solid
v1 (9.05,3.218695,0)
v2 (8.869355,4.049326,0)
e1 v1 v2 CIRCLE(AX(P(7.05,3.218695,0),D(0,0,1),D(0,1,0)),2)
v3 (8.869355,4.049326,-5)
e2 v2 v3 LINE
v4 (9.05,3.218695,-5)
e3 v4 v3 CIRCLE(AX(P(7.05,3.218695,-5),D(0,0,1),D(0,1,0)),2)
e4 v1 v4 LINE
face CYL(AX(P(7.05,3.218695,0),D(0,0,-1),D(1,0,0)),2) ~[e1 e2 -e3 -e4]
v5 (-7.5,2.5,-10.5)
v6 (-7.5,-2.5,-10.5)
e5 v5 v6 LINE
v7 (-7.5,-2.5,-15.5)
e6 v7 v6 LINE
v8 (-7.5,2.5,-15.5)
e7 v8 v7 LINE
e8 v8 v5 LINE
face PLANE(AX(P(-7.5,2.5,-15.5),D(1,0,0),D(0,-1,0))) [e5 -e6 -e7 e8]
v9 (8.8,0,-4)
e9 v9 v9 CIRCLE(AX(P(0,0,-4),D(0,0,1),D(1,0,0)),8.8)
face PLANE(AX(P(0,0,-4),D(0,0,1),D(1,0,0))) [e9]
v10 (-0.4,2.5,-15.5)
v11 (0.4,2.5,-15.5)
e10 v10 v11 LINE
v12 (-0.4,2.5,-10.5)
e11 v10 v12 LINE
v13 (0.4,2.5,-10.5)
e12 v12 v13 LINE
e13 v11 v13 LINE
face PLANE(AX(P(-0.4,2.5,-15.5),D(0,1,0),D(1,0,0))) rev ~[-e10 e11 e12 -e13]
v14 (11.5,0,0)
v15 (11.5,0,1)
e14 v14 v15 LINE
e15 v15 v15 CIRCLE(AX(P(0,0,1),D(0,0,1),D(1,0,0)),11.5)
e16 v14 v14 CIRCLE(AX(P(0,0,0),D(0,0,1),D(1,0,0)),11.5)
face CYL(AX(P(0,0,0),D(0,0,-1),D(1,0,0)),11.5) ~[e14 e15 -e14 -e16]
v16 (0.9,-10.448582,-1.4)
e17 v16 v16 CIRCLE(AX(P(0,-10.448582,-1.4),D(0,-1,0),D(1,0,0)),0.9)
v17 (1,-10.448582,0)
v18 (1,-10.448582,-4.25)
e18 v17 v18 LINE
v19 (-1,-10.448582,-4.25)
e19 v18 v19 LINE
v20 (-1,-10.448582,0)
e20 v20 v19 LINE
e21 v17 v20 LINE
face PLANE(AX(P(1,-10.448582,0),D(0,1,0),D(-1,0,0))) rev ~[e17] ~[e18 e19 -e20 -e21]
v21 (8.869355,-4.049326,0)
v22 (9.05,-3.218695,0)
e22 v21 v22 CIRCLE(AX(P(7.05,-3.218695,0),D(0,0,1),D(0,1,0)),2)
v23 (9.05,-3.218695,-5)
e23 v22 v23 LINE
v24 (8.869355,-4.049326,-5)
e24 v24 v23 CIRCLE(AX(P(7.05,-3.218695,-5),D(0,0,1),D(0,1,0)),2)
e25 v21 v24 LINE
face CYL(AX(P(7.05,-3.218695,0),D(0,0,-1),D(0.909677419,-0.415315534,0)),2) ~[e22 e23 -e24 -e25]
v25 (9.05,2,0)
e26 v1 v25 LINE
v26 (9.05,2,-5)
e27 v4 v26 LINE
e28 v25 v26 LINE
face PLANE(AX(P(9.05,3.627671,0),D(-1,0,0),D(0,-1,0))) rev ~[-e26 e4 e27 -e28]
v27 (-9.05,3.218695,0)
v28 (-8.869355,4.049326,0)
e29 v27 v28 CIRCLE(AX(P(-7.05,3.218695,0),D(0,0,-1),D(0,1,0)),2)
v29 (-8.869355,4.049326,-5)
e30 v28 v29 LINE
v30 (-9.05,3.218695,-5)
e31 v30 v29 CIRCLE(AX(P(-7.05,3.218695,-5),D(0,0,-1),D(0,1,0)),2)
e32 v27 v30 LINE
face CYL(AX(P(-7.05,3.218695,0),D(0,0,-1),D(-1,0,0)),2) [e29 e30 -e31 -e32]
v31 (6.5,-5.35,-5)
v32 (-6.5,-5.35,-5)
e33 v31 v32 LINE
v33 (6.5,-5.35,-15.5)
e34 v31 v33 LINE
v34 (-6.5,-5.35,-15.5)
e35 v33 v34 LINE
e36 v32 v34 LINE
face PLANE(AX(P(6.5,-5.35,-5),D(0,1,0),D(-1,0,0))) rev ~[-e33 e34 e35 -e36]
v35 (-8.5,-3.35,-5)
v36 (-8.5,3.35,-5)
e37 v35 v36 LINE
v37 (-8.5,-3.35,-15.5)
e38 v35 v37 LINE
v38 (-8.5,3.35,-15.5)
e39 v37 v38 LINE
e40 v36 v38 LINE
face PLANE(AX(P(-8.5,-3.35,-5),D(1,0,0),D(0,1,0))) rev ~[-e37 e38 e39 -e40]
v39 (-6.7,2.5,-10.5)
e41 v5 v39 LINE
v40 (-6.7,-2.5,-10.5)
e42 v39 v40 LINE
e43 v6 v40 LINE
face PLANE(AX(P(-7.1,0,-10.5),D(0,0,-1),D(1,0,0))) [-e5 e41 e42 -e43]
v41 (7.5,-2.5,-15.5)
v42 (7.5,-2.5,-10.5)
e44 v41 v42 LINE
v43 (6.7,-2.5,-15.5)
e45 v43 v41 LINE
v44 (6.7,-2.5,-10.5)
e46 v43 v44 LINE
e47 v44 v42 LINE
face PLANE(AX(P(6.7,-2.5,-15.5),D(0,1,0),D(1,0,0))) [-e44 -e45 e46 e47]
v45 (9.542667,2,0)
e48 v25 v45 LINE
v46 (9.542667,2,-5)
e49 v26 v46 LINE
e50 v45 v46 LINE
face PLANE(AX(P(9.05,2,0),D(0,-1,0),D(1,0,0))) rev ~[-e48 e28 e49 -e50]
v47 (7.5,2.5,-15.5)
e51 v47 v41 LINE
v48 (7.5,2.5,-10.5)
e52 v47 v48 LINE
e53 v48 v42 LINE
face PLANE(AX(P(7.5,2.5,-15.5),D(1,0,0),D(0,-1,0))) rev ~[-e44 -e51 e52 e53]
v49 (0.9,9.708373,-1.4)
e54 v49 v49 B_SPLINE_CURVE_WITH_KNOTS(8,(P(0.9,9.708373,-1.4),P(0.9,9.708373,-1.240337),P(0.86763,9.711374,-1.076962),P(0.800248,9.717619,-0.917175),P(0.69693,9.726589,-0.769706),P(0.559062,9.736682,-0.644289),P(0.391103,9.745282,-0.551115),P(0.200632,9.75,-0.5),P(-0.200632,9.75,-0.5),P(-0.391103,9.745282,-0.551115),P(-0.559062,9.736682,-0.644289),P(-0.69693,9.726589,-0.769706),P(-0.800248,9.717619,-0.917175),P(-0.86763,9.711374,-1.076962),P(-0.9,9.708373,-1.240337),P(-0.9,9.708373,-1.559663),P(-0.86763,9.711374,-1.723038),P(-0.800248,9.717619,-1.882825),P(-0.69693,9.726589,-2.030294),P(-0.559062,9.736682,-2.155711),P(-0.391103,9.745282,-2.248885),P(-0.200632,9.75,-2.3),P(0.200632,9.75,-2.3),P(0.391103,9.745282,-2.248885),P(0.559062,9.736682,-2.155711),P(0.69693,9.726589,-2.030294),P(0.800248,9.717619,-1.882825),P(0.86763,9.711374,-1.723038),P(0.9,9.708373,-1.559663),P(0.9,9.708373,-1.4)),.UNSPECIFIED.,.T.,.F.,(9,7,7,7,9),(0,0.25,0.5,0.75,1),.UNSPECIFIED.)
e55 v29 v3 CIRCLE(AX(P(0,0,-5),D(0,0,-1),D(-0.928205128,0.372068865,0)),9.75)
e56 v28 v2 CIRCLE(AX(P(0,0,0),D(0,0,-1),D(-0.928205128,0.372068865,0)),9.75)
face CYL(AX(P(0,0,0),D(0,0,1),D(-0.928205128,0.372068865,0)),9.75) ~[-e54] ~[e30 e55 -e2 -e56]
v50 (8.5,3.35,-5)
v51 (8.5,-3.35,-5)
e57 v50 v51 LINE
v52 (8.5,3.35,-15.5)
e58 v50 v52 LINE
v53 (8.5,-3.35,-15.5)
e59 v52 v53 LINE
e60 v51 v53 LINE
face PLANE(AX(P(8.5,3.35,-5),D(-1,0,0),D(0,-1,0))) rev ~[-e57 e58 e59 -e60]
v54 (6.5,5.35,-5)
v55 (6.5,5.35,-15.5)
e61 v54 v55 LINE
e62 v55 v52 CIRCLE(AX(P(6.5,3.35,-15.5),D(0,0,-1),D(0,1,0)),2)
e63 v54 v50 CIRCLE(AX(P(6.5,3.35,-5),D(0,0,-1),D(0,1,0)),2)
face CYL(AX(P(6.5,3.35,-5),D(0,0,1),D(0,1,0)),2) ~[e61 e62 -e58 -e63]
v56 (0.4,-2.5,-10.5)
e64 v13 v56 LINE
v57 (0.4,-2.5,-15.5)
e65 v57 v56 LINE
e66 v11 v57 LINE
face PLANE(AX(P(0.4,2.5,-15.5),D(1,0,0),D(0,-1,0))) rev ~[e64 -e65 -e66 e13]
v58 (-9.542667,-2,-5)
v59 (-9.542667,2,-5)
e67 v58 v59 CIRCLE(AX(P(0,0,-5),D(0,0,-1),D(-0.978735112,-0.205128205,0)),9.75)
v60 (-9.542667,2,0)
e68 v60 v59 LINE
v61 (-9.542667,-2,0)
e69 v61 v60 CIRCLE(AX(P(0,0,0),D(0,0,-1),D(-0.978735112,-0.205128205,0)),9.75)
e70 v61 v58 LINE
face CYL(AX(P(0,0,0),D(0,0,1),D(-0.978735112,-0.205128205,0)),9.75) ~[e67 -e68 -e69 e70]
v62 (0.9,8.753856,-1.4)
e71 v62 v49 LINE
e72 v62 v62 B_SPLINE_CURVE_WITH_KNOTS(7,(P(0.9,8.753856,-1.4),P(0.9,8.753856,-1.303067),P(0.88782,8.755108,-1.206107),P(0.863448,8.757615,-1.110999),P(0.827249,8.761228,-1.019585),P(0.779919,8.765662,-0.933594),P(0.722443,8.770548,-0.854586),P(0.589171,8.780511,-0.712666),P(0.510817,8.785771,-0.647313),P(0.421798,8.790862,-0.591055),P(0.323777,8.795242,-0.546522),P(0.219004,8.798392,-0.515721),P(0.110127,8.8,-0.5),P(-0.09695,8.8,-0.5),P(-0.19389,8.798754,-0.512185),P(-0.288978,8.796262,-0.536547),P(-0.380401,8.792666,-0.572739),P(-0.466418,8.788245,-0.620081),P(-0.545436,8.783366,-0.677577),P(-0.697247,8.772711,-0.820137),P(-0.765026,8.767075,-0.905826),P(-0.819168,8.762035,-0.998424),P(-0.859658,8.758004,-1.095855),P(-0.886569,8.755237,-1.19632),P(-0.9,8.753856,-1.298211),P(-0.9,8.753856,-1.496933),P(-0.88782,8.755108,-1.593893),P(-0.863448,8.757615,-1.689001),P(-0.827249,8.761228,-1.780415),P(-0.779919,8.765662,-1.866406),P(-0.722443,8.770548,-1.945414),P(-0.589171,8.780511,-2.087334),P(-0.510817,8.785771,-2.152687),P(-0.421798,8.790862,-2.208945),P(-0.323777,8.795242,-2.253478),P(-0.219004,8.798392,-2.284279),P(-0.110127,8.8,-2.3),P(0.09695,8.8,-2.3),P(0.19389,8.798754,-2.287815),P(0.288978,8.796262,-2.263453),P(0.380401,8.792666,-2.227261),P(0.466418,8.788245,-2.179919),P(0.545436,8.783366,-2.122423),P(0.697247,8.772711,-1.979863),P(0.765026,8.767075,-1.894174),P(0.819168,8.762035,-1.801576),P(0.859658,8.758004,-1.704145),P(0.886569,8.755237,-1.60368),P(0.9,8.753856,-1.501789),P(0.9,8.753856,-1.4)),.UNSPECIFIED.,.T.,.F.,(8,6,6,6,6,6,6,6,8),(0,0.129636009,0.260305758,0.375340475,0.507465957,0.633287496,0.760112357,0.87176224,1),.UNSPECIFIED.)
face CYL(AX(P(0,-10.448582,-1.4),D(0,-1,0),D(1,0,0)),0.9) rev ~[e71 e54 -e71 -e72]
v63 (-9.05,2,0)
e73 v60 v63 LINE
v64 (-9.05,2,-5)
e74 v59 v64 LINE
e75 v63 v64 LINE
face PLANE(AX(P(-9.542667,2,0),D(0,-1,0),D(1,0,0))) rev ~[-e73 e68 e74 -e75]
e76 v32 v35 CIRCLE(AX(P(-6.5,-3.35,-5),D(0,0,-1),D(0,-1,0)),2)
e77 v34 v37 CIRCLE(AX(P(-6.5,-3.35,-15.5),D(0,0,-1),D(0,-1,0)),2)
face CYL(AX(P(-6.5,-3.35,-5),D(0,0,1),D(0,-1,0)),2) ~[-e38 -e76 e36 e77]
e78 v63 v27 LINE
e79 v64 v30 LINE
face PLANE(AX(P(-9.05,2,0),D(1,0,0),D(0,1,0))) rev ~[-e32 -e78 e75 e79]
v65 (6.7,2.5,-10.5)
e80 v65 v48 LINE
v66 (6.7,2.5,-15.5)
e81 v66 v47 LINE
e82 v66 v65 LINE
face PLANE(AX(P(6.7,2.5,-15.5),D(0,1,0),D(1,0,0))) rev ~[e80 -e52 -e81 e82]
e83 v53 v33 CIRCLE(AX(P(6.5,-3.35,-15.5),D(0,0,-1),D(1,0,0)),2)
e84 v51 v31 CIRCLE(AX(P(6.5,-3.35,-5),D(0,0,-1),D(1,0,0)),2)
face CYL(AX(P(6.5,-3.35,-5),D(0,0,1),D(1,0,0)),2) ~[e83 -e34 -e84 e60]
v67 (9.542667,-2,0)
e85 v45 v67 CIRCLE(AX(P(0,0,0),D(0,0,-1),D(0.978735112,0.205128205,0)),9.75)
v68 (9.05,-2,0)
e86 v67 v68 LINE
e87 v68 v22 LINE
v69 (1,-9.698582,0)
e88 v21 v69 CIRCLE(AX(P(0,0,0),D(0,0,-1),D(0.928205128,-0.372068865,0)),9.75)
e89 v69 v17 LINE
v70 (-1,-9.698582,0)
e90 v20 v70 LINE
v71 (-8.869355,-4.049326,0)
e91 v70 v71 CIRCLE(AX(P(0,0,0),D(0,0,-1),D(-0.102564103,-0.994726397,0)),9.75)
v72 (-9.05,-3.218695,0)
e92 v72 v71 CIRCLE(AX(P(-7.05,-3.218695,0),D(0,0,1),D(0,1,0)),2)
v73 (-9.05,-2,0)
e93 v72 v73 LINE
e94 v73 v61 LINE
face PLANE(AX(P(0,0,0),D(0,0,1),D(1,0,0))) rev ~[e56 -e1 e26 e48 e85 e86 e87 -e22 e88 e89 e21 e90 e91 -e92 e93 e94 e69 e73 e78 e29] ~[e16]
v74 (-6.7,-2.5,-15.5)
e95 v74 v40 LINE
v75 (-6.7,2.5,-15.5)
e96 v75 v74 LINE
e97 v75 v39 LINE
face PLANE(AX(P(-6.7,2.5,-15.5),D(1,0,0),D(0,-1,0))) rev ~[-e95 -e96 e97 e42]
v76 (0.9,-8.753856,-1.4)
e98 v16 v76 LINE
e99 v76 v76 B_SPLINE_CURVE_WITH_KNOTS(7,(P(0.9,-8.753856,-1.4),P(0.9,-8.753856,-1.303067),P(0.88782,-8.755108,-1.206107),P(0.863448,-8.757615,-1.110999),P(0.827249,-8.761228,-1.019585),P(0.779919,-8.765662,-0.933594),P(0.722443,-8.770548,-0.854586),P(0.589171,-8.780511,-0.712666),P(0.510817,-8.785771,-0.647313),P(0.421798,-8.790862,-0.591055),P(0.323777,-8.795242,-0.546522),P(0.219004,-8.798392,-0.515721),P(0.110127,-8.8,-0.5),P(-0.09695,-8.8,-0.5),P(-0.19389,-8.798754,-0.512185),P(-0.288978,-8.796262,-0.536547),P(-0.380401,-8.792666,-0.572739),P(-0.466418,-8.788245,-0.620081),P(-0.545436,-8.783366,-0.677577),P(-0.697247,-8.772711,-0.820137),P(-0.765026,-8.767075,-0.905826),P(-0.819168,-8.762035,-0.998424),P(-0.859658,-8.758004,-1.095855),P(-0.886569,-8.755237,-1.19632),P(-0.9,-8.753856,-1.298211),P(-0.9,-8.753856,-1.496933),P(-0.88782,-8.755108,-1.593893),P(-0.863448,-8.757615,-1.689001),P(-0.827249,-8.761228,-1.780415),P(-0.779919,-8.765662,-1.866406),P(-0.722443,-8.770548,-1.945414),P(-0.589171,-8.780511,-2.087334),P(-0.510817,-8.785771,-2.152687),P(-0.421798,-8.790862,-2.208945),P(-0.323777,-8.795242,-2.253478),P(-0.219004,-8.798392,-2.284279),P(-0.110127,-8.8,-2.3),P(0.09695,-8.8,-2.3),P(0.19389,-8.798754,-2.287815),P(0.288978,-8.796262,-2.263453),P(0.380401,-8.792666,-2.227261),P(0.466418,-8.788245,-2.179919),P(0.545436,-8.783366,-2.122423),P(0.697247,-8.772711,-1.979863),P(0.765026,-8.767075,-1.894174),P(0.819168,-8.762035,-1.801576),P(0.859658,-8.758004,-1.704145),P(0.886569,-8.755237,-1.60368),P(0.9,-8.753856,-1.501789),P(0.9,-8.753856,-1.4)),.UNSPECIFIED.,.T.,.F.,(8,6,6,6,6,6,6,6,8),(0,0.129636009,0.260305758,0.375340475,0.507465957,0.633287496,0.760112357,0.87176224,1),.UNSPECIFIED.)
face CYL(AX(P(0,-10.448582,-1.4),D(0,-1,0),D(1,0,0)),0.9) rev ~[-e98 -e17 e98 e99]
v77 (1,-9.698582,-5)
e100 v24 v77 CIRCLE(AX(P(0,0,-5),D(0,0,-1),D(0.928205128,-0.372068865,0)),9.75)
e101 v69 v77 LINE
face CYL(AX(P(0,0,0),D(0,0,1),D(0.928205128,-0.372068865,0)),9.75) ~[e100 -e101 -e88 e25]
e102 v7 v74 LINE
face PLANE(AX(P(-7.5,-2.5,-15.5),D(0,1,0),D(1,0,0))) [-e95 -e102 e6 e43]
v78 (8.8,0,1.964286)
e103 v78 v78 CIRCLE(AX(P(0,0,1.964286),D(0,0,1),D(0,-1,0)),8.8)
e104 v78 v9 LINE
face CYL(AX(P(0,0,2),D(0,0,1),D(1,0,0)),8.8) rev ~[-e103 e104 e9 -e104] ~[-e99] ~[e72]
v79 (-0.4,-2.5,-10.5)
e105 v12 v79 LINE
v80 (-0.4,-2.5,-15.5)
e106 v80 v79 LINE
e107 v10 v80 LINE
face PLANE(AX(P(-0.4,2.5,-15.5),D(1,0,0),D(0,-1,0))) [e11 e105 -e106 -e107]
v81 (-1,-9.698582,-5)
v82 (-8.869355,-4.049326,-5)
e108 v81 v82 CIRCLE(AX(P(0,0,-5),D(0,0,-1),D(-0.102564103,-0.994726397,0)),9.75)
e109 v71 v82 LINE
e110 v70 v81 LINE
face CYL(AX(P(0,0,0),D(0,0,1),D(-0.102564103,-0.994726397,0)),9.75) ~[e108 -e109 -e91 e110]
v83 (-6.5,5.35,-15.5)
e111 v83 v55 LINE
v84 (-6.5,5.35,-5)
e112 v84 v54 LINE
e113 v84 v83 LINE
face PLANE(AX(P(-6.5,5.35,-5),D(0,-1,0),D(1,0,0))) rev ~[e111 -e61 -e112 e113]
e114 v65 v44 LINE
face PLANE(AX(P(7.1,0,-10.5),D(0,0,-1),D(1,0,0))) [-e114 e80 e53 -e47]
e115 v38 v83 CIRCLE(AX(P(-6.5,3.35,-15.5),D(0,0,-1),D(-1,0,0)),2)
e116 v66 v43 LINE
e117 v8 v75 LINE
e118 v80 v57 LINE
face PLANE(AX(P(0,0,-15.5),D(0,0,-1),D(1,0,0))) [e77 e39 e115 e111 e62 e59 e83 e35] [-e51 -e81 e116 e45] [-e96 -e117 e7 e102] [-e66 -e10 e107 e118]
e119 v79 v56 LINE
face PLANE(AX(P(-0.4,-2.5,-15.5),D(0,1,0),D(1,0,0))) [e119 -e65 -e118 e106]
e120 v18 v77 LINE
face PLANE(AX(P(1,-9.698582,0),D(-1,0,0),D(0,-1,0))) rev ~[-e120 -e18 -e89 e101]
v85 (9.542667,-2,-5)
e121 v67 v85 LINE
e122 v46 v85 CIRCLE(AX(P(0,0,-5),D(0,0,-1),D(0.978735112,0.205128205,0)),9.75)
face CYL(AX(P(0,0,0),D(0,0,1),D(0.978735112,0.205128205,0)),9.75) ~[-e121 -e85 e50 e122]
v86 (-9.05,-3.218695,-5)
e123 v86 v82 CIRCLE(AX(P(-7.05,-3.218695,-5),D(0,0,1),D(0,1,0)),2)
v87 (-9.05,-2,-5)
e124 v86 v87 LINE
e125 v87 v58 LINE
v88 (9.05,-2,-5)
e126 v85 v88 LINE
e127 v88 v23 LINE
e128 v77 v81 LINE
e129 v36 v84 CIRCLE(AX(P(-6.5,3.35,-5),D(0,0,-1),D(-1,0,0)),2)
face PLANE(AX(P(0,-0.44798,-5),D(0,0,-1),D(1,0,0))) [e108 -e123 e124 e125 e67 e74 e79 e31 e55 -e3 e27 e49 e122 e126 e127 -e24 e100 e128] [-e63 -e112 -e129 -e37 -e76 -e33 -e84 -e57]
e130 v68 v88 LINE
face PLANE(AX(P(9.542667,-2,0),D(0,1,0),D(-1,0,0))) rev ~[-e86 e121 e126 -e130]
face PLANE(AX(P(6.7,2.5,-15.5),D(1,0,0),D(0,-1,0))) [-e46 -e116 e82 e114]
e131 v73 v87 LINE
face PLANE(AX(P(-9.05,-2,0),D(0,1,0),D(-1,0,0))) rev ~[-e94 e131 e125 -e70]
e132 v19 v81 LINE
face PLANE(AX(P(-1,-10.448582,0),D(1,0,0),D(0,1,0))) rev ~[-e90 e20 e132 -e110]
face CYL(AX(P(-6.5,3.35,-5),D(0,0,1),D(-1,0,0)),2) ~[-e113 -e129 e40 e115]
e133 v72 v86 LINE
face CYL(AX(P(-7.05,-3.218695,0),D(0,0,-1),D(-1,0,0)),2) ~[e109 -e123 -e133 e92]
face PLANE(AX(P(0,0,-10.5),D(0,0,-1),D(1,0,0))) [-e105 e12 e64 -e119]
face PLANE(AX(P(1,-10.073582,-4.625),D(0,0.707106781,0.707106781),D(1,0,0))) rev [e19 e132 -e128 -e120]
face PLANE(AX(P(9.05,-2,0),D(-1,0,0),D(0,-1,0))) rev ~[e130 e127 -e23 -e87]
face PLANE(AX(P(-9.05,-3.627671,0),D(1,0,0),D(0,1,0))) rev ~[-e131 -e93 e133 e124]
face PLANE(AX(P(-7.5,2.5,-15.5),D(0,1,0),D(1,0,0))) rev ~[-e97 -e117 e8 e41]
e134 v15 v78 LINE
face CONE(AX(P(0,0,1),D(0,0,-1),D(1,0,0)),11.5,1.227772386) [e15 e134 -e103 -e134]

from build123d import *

# Parameters (mm, degrees)
F0_R      = 11.5
F1_DEPTH  = 2
F3_DEPTH  = 5
F5_DEPTH  = 10.5
F6_W      = 0.8
F6_H      = 5
F7_DEPTH  = 5
F8_R      = 8.8
F9_DEPTH  = 6
F11_R     = 2
F12_SIZE  = 0.75
F13_R     = 0.9
F14_DEPTH = 21.9495823706


# Not quite as in the source:
# - a fillet or chamfer that OpenCascade refuses, or shapes differently, is made with other operations: its cross-section is extruded or revolved along the edge and cut away or added


with BuildPart() as f1:
    # F0 (on Top) → F1 (new body)
    with BuildSketch(Plane.XY):
        Circle(F0_R)
    extrude(amount=F1_DEPTH)

    # F2 (on face) → F3 (join)
    with BuildSketch(Plane(origin=(0, 0, 0), x_dir=(1, 0, 0), z_dir=(0, 0, -1))):
        with BuildLine():
            Line((-9.05, -2), (-9.05, -3.6276714294))
            ThreePointArc((-9.05, -3.6276714294), (0, -9.75), (9.05, -3.6276714294))
            Line((9.05, -3.6276714294), (9.05, -2))
            Line((9.05, -2), (9.05, 2))
            Line((9.05, 2), (9.05, 3.6276714294))
            ThreePointArc((9.05, 3.6276714294), (5.8706571109, 7.7844643416), (1, 9.6985823706))
            Line((1, 9.6985823706), (1, 10.4485823706))
            Line((1, 10.4485823706), (-1, 10.4485823706))
            Line((-1, 10.4485823706), (-1, 9.6985823706))
            ThreePointArc((-1, 9.6985823706), (-5.8706571109, 7.7844643416), (-9.05, 3.6276714294))
            Line((-9.05, 3.6276714294), (-9.05, 2))
            Line((-9.05, 2), (-9.05, -2))
        make_face()
        with BuildLine():
            Line((-9.542667342, -2), (-9.05, -2))
            Line((-9.05, -2), (-9.05, 2))
            Line((-9.05, 2), (-9.542667342, 2))
            ThreePointArc((-9.542667342, 2), (-9.75, 0), (-9.542667342, -2))
        make_face()
        with BuildLine():
            Line((9.05, 2), (9.05, -2))
            Line((9.05, -2), (9.542667342, -2))
            ThreePointArc((9.542667342, -2), (9.75, 0), (9.542667342, 2))
            Line((9.542667342, 2), (9.05, 2))
        make_face()
    extrude(amount=F3_DEPTH)

    # F4 (on face) → F5 (join)
    with BuildSketch(Plane(origin=(0, 0, -5), x_dir=(1, 0, 0), z_dir=(0, 0, -1))):
        with BuildLine():
            Line((6.5, 5.35), (-6.5, 5.35))
            ThreePointArc((-6.5, 5.35), (-7.9142135624, 4.7642135624), (-8.5, 3.35))
            Line((-8.5, 3.35), (-8.5, -3.35))
            ThreePointArc((-8.5, -3.35), (-7.9142135624, -4.7642135624), (-6.5, -5.35))
            Line((-6.5, -5.35), (6.5, -5.35))
            ThreePointArc((6.5, -5.35), (7.9142135624, -4.7642135624), (8.5, -3.35))
            Line((8.5, -3.35), (8.5, 3.35))
            ThreePointArc((8.5, 3.35), (7.9142135624, 4.7642135624), (6.5, 5.35))
        make_face()
    extrude(amount=F5_DEPTH)

    # F6 (on face) → F7 (cut)
    with BuildSketch(Plane(origin=(0, 0, -15.5), x_dir=(1, 0, 0), z_dir=(0, 0, -1))):
        Rectangle(F6_W, F6_H)
        with Locations((-7.1, 0)):
            Rectangle(F6_W, F6_H)
        with Locations((7.1, 0)):
            Rectangle(F6_W, F6_H)
    extrude(amount=-F7_DEPTH, mode=Mode.SUBTRACT)

    # F8 (on face) → F9 (cut)
    with BuildSketch(Plane.XY.offset(2)):
        Circle(F8_R)
    extrude(amount=-F9_DEPTH, mode=Mode.SUBTRACT)

    # F10: chamfer of 2.8 x 1 on 1 edges, made by hand

    # F10_s1 → F10_t2 (revolve, cut)
    with BuildSketch(Plane.XZ):
        Polygon((11.5, 1), (8.7, 2), (11.5, 2), align=None)
    revolve(axis=Axis((0, 0, 2), (0, 0, 1)), mode=Mode.SUBTRACT)

    # F11
    f11_edges = [f1.edges().sort_by_distance(p)[0] for p in [
        (-9.05, 3.627671, -2.5),
        (-9.05, -3.627671, -2.5),
        (9.05, -3.627671, -2.5),
        (9.05, 3.627671, -2.5),
    ]]
    fillet(f11_edges, radius=F11_R)

    # F12
    f12_edges = [f1.edges().sort_by_distance(p)[0] for p in [
        (0, -10.448582, -5),
    ]]
    chamfer(f12_edges, length=F12_SIZE)

    # F13 (on face) → F14 (cut, through all)
    with BuildSketch(Plane.XZ.offset(10.4485823706)):
        with Locations((0, -1.4)):
            Circle(F13_R)
    extrude(amount=-F14_DEPTH, mode=Mode.SUBTRACT)


solid = f1.part
